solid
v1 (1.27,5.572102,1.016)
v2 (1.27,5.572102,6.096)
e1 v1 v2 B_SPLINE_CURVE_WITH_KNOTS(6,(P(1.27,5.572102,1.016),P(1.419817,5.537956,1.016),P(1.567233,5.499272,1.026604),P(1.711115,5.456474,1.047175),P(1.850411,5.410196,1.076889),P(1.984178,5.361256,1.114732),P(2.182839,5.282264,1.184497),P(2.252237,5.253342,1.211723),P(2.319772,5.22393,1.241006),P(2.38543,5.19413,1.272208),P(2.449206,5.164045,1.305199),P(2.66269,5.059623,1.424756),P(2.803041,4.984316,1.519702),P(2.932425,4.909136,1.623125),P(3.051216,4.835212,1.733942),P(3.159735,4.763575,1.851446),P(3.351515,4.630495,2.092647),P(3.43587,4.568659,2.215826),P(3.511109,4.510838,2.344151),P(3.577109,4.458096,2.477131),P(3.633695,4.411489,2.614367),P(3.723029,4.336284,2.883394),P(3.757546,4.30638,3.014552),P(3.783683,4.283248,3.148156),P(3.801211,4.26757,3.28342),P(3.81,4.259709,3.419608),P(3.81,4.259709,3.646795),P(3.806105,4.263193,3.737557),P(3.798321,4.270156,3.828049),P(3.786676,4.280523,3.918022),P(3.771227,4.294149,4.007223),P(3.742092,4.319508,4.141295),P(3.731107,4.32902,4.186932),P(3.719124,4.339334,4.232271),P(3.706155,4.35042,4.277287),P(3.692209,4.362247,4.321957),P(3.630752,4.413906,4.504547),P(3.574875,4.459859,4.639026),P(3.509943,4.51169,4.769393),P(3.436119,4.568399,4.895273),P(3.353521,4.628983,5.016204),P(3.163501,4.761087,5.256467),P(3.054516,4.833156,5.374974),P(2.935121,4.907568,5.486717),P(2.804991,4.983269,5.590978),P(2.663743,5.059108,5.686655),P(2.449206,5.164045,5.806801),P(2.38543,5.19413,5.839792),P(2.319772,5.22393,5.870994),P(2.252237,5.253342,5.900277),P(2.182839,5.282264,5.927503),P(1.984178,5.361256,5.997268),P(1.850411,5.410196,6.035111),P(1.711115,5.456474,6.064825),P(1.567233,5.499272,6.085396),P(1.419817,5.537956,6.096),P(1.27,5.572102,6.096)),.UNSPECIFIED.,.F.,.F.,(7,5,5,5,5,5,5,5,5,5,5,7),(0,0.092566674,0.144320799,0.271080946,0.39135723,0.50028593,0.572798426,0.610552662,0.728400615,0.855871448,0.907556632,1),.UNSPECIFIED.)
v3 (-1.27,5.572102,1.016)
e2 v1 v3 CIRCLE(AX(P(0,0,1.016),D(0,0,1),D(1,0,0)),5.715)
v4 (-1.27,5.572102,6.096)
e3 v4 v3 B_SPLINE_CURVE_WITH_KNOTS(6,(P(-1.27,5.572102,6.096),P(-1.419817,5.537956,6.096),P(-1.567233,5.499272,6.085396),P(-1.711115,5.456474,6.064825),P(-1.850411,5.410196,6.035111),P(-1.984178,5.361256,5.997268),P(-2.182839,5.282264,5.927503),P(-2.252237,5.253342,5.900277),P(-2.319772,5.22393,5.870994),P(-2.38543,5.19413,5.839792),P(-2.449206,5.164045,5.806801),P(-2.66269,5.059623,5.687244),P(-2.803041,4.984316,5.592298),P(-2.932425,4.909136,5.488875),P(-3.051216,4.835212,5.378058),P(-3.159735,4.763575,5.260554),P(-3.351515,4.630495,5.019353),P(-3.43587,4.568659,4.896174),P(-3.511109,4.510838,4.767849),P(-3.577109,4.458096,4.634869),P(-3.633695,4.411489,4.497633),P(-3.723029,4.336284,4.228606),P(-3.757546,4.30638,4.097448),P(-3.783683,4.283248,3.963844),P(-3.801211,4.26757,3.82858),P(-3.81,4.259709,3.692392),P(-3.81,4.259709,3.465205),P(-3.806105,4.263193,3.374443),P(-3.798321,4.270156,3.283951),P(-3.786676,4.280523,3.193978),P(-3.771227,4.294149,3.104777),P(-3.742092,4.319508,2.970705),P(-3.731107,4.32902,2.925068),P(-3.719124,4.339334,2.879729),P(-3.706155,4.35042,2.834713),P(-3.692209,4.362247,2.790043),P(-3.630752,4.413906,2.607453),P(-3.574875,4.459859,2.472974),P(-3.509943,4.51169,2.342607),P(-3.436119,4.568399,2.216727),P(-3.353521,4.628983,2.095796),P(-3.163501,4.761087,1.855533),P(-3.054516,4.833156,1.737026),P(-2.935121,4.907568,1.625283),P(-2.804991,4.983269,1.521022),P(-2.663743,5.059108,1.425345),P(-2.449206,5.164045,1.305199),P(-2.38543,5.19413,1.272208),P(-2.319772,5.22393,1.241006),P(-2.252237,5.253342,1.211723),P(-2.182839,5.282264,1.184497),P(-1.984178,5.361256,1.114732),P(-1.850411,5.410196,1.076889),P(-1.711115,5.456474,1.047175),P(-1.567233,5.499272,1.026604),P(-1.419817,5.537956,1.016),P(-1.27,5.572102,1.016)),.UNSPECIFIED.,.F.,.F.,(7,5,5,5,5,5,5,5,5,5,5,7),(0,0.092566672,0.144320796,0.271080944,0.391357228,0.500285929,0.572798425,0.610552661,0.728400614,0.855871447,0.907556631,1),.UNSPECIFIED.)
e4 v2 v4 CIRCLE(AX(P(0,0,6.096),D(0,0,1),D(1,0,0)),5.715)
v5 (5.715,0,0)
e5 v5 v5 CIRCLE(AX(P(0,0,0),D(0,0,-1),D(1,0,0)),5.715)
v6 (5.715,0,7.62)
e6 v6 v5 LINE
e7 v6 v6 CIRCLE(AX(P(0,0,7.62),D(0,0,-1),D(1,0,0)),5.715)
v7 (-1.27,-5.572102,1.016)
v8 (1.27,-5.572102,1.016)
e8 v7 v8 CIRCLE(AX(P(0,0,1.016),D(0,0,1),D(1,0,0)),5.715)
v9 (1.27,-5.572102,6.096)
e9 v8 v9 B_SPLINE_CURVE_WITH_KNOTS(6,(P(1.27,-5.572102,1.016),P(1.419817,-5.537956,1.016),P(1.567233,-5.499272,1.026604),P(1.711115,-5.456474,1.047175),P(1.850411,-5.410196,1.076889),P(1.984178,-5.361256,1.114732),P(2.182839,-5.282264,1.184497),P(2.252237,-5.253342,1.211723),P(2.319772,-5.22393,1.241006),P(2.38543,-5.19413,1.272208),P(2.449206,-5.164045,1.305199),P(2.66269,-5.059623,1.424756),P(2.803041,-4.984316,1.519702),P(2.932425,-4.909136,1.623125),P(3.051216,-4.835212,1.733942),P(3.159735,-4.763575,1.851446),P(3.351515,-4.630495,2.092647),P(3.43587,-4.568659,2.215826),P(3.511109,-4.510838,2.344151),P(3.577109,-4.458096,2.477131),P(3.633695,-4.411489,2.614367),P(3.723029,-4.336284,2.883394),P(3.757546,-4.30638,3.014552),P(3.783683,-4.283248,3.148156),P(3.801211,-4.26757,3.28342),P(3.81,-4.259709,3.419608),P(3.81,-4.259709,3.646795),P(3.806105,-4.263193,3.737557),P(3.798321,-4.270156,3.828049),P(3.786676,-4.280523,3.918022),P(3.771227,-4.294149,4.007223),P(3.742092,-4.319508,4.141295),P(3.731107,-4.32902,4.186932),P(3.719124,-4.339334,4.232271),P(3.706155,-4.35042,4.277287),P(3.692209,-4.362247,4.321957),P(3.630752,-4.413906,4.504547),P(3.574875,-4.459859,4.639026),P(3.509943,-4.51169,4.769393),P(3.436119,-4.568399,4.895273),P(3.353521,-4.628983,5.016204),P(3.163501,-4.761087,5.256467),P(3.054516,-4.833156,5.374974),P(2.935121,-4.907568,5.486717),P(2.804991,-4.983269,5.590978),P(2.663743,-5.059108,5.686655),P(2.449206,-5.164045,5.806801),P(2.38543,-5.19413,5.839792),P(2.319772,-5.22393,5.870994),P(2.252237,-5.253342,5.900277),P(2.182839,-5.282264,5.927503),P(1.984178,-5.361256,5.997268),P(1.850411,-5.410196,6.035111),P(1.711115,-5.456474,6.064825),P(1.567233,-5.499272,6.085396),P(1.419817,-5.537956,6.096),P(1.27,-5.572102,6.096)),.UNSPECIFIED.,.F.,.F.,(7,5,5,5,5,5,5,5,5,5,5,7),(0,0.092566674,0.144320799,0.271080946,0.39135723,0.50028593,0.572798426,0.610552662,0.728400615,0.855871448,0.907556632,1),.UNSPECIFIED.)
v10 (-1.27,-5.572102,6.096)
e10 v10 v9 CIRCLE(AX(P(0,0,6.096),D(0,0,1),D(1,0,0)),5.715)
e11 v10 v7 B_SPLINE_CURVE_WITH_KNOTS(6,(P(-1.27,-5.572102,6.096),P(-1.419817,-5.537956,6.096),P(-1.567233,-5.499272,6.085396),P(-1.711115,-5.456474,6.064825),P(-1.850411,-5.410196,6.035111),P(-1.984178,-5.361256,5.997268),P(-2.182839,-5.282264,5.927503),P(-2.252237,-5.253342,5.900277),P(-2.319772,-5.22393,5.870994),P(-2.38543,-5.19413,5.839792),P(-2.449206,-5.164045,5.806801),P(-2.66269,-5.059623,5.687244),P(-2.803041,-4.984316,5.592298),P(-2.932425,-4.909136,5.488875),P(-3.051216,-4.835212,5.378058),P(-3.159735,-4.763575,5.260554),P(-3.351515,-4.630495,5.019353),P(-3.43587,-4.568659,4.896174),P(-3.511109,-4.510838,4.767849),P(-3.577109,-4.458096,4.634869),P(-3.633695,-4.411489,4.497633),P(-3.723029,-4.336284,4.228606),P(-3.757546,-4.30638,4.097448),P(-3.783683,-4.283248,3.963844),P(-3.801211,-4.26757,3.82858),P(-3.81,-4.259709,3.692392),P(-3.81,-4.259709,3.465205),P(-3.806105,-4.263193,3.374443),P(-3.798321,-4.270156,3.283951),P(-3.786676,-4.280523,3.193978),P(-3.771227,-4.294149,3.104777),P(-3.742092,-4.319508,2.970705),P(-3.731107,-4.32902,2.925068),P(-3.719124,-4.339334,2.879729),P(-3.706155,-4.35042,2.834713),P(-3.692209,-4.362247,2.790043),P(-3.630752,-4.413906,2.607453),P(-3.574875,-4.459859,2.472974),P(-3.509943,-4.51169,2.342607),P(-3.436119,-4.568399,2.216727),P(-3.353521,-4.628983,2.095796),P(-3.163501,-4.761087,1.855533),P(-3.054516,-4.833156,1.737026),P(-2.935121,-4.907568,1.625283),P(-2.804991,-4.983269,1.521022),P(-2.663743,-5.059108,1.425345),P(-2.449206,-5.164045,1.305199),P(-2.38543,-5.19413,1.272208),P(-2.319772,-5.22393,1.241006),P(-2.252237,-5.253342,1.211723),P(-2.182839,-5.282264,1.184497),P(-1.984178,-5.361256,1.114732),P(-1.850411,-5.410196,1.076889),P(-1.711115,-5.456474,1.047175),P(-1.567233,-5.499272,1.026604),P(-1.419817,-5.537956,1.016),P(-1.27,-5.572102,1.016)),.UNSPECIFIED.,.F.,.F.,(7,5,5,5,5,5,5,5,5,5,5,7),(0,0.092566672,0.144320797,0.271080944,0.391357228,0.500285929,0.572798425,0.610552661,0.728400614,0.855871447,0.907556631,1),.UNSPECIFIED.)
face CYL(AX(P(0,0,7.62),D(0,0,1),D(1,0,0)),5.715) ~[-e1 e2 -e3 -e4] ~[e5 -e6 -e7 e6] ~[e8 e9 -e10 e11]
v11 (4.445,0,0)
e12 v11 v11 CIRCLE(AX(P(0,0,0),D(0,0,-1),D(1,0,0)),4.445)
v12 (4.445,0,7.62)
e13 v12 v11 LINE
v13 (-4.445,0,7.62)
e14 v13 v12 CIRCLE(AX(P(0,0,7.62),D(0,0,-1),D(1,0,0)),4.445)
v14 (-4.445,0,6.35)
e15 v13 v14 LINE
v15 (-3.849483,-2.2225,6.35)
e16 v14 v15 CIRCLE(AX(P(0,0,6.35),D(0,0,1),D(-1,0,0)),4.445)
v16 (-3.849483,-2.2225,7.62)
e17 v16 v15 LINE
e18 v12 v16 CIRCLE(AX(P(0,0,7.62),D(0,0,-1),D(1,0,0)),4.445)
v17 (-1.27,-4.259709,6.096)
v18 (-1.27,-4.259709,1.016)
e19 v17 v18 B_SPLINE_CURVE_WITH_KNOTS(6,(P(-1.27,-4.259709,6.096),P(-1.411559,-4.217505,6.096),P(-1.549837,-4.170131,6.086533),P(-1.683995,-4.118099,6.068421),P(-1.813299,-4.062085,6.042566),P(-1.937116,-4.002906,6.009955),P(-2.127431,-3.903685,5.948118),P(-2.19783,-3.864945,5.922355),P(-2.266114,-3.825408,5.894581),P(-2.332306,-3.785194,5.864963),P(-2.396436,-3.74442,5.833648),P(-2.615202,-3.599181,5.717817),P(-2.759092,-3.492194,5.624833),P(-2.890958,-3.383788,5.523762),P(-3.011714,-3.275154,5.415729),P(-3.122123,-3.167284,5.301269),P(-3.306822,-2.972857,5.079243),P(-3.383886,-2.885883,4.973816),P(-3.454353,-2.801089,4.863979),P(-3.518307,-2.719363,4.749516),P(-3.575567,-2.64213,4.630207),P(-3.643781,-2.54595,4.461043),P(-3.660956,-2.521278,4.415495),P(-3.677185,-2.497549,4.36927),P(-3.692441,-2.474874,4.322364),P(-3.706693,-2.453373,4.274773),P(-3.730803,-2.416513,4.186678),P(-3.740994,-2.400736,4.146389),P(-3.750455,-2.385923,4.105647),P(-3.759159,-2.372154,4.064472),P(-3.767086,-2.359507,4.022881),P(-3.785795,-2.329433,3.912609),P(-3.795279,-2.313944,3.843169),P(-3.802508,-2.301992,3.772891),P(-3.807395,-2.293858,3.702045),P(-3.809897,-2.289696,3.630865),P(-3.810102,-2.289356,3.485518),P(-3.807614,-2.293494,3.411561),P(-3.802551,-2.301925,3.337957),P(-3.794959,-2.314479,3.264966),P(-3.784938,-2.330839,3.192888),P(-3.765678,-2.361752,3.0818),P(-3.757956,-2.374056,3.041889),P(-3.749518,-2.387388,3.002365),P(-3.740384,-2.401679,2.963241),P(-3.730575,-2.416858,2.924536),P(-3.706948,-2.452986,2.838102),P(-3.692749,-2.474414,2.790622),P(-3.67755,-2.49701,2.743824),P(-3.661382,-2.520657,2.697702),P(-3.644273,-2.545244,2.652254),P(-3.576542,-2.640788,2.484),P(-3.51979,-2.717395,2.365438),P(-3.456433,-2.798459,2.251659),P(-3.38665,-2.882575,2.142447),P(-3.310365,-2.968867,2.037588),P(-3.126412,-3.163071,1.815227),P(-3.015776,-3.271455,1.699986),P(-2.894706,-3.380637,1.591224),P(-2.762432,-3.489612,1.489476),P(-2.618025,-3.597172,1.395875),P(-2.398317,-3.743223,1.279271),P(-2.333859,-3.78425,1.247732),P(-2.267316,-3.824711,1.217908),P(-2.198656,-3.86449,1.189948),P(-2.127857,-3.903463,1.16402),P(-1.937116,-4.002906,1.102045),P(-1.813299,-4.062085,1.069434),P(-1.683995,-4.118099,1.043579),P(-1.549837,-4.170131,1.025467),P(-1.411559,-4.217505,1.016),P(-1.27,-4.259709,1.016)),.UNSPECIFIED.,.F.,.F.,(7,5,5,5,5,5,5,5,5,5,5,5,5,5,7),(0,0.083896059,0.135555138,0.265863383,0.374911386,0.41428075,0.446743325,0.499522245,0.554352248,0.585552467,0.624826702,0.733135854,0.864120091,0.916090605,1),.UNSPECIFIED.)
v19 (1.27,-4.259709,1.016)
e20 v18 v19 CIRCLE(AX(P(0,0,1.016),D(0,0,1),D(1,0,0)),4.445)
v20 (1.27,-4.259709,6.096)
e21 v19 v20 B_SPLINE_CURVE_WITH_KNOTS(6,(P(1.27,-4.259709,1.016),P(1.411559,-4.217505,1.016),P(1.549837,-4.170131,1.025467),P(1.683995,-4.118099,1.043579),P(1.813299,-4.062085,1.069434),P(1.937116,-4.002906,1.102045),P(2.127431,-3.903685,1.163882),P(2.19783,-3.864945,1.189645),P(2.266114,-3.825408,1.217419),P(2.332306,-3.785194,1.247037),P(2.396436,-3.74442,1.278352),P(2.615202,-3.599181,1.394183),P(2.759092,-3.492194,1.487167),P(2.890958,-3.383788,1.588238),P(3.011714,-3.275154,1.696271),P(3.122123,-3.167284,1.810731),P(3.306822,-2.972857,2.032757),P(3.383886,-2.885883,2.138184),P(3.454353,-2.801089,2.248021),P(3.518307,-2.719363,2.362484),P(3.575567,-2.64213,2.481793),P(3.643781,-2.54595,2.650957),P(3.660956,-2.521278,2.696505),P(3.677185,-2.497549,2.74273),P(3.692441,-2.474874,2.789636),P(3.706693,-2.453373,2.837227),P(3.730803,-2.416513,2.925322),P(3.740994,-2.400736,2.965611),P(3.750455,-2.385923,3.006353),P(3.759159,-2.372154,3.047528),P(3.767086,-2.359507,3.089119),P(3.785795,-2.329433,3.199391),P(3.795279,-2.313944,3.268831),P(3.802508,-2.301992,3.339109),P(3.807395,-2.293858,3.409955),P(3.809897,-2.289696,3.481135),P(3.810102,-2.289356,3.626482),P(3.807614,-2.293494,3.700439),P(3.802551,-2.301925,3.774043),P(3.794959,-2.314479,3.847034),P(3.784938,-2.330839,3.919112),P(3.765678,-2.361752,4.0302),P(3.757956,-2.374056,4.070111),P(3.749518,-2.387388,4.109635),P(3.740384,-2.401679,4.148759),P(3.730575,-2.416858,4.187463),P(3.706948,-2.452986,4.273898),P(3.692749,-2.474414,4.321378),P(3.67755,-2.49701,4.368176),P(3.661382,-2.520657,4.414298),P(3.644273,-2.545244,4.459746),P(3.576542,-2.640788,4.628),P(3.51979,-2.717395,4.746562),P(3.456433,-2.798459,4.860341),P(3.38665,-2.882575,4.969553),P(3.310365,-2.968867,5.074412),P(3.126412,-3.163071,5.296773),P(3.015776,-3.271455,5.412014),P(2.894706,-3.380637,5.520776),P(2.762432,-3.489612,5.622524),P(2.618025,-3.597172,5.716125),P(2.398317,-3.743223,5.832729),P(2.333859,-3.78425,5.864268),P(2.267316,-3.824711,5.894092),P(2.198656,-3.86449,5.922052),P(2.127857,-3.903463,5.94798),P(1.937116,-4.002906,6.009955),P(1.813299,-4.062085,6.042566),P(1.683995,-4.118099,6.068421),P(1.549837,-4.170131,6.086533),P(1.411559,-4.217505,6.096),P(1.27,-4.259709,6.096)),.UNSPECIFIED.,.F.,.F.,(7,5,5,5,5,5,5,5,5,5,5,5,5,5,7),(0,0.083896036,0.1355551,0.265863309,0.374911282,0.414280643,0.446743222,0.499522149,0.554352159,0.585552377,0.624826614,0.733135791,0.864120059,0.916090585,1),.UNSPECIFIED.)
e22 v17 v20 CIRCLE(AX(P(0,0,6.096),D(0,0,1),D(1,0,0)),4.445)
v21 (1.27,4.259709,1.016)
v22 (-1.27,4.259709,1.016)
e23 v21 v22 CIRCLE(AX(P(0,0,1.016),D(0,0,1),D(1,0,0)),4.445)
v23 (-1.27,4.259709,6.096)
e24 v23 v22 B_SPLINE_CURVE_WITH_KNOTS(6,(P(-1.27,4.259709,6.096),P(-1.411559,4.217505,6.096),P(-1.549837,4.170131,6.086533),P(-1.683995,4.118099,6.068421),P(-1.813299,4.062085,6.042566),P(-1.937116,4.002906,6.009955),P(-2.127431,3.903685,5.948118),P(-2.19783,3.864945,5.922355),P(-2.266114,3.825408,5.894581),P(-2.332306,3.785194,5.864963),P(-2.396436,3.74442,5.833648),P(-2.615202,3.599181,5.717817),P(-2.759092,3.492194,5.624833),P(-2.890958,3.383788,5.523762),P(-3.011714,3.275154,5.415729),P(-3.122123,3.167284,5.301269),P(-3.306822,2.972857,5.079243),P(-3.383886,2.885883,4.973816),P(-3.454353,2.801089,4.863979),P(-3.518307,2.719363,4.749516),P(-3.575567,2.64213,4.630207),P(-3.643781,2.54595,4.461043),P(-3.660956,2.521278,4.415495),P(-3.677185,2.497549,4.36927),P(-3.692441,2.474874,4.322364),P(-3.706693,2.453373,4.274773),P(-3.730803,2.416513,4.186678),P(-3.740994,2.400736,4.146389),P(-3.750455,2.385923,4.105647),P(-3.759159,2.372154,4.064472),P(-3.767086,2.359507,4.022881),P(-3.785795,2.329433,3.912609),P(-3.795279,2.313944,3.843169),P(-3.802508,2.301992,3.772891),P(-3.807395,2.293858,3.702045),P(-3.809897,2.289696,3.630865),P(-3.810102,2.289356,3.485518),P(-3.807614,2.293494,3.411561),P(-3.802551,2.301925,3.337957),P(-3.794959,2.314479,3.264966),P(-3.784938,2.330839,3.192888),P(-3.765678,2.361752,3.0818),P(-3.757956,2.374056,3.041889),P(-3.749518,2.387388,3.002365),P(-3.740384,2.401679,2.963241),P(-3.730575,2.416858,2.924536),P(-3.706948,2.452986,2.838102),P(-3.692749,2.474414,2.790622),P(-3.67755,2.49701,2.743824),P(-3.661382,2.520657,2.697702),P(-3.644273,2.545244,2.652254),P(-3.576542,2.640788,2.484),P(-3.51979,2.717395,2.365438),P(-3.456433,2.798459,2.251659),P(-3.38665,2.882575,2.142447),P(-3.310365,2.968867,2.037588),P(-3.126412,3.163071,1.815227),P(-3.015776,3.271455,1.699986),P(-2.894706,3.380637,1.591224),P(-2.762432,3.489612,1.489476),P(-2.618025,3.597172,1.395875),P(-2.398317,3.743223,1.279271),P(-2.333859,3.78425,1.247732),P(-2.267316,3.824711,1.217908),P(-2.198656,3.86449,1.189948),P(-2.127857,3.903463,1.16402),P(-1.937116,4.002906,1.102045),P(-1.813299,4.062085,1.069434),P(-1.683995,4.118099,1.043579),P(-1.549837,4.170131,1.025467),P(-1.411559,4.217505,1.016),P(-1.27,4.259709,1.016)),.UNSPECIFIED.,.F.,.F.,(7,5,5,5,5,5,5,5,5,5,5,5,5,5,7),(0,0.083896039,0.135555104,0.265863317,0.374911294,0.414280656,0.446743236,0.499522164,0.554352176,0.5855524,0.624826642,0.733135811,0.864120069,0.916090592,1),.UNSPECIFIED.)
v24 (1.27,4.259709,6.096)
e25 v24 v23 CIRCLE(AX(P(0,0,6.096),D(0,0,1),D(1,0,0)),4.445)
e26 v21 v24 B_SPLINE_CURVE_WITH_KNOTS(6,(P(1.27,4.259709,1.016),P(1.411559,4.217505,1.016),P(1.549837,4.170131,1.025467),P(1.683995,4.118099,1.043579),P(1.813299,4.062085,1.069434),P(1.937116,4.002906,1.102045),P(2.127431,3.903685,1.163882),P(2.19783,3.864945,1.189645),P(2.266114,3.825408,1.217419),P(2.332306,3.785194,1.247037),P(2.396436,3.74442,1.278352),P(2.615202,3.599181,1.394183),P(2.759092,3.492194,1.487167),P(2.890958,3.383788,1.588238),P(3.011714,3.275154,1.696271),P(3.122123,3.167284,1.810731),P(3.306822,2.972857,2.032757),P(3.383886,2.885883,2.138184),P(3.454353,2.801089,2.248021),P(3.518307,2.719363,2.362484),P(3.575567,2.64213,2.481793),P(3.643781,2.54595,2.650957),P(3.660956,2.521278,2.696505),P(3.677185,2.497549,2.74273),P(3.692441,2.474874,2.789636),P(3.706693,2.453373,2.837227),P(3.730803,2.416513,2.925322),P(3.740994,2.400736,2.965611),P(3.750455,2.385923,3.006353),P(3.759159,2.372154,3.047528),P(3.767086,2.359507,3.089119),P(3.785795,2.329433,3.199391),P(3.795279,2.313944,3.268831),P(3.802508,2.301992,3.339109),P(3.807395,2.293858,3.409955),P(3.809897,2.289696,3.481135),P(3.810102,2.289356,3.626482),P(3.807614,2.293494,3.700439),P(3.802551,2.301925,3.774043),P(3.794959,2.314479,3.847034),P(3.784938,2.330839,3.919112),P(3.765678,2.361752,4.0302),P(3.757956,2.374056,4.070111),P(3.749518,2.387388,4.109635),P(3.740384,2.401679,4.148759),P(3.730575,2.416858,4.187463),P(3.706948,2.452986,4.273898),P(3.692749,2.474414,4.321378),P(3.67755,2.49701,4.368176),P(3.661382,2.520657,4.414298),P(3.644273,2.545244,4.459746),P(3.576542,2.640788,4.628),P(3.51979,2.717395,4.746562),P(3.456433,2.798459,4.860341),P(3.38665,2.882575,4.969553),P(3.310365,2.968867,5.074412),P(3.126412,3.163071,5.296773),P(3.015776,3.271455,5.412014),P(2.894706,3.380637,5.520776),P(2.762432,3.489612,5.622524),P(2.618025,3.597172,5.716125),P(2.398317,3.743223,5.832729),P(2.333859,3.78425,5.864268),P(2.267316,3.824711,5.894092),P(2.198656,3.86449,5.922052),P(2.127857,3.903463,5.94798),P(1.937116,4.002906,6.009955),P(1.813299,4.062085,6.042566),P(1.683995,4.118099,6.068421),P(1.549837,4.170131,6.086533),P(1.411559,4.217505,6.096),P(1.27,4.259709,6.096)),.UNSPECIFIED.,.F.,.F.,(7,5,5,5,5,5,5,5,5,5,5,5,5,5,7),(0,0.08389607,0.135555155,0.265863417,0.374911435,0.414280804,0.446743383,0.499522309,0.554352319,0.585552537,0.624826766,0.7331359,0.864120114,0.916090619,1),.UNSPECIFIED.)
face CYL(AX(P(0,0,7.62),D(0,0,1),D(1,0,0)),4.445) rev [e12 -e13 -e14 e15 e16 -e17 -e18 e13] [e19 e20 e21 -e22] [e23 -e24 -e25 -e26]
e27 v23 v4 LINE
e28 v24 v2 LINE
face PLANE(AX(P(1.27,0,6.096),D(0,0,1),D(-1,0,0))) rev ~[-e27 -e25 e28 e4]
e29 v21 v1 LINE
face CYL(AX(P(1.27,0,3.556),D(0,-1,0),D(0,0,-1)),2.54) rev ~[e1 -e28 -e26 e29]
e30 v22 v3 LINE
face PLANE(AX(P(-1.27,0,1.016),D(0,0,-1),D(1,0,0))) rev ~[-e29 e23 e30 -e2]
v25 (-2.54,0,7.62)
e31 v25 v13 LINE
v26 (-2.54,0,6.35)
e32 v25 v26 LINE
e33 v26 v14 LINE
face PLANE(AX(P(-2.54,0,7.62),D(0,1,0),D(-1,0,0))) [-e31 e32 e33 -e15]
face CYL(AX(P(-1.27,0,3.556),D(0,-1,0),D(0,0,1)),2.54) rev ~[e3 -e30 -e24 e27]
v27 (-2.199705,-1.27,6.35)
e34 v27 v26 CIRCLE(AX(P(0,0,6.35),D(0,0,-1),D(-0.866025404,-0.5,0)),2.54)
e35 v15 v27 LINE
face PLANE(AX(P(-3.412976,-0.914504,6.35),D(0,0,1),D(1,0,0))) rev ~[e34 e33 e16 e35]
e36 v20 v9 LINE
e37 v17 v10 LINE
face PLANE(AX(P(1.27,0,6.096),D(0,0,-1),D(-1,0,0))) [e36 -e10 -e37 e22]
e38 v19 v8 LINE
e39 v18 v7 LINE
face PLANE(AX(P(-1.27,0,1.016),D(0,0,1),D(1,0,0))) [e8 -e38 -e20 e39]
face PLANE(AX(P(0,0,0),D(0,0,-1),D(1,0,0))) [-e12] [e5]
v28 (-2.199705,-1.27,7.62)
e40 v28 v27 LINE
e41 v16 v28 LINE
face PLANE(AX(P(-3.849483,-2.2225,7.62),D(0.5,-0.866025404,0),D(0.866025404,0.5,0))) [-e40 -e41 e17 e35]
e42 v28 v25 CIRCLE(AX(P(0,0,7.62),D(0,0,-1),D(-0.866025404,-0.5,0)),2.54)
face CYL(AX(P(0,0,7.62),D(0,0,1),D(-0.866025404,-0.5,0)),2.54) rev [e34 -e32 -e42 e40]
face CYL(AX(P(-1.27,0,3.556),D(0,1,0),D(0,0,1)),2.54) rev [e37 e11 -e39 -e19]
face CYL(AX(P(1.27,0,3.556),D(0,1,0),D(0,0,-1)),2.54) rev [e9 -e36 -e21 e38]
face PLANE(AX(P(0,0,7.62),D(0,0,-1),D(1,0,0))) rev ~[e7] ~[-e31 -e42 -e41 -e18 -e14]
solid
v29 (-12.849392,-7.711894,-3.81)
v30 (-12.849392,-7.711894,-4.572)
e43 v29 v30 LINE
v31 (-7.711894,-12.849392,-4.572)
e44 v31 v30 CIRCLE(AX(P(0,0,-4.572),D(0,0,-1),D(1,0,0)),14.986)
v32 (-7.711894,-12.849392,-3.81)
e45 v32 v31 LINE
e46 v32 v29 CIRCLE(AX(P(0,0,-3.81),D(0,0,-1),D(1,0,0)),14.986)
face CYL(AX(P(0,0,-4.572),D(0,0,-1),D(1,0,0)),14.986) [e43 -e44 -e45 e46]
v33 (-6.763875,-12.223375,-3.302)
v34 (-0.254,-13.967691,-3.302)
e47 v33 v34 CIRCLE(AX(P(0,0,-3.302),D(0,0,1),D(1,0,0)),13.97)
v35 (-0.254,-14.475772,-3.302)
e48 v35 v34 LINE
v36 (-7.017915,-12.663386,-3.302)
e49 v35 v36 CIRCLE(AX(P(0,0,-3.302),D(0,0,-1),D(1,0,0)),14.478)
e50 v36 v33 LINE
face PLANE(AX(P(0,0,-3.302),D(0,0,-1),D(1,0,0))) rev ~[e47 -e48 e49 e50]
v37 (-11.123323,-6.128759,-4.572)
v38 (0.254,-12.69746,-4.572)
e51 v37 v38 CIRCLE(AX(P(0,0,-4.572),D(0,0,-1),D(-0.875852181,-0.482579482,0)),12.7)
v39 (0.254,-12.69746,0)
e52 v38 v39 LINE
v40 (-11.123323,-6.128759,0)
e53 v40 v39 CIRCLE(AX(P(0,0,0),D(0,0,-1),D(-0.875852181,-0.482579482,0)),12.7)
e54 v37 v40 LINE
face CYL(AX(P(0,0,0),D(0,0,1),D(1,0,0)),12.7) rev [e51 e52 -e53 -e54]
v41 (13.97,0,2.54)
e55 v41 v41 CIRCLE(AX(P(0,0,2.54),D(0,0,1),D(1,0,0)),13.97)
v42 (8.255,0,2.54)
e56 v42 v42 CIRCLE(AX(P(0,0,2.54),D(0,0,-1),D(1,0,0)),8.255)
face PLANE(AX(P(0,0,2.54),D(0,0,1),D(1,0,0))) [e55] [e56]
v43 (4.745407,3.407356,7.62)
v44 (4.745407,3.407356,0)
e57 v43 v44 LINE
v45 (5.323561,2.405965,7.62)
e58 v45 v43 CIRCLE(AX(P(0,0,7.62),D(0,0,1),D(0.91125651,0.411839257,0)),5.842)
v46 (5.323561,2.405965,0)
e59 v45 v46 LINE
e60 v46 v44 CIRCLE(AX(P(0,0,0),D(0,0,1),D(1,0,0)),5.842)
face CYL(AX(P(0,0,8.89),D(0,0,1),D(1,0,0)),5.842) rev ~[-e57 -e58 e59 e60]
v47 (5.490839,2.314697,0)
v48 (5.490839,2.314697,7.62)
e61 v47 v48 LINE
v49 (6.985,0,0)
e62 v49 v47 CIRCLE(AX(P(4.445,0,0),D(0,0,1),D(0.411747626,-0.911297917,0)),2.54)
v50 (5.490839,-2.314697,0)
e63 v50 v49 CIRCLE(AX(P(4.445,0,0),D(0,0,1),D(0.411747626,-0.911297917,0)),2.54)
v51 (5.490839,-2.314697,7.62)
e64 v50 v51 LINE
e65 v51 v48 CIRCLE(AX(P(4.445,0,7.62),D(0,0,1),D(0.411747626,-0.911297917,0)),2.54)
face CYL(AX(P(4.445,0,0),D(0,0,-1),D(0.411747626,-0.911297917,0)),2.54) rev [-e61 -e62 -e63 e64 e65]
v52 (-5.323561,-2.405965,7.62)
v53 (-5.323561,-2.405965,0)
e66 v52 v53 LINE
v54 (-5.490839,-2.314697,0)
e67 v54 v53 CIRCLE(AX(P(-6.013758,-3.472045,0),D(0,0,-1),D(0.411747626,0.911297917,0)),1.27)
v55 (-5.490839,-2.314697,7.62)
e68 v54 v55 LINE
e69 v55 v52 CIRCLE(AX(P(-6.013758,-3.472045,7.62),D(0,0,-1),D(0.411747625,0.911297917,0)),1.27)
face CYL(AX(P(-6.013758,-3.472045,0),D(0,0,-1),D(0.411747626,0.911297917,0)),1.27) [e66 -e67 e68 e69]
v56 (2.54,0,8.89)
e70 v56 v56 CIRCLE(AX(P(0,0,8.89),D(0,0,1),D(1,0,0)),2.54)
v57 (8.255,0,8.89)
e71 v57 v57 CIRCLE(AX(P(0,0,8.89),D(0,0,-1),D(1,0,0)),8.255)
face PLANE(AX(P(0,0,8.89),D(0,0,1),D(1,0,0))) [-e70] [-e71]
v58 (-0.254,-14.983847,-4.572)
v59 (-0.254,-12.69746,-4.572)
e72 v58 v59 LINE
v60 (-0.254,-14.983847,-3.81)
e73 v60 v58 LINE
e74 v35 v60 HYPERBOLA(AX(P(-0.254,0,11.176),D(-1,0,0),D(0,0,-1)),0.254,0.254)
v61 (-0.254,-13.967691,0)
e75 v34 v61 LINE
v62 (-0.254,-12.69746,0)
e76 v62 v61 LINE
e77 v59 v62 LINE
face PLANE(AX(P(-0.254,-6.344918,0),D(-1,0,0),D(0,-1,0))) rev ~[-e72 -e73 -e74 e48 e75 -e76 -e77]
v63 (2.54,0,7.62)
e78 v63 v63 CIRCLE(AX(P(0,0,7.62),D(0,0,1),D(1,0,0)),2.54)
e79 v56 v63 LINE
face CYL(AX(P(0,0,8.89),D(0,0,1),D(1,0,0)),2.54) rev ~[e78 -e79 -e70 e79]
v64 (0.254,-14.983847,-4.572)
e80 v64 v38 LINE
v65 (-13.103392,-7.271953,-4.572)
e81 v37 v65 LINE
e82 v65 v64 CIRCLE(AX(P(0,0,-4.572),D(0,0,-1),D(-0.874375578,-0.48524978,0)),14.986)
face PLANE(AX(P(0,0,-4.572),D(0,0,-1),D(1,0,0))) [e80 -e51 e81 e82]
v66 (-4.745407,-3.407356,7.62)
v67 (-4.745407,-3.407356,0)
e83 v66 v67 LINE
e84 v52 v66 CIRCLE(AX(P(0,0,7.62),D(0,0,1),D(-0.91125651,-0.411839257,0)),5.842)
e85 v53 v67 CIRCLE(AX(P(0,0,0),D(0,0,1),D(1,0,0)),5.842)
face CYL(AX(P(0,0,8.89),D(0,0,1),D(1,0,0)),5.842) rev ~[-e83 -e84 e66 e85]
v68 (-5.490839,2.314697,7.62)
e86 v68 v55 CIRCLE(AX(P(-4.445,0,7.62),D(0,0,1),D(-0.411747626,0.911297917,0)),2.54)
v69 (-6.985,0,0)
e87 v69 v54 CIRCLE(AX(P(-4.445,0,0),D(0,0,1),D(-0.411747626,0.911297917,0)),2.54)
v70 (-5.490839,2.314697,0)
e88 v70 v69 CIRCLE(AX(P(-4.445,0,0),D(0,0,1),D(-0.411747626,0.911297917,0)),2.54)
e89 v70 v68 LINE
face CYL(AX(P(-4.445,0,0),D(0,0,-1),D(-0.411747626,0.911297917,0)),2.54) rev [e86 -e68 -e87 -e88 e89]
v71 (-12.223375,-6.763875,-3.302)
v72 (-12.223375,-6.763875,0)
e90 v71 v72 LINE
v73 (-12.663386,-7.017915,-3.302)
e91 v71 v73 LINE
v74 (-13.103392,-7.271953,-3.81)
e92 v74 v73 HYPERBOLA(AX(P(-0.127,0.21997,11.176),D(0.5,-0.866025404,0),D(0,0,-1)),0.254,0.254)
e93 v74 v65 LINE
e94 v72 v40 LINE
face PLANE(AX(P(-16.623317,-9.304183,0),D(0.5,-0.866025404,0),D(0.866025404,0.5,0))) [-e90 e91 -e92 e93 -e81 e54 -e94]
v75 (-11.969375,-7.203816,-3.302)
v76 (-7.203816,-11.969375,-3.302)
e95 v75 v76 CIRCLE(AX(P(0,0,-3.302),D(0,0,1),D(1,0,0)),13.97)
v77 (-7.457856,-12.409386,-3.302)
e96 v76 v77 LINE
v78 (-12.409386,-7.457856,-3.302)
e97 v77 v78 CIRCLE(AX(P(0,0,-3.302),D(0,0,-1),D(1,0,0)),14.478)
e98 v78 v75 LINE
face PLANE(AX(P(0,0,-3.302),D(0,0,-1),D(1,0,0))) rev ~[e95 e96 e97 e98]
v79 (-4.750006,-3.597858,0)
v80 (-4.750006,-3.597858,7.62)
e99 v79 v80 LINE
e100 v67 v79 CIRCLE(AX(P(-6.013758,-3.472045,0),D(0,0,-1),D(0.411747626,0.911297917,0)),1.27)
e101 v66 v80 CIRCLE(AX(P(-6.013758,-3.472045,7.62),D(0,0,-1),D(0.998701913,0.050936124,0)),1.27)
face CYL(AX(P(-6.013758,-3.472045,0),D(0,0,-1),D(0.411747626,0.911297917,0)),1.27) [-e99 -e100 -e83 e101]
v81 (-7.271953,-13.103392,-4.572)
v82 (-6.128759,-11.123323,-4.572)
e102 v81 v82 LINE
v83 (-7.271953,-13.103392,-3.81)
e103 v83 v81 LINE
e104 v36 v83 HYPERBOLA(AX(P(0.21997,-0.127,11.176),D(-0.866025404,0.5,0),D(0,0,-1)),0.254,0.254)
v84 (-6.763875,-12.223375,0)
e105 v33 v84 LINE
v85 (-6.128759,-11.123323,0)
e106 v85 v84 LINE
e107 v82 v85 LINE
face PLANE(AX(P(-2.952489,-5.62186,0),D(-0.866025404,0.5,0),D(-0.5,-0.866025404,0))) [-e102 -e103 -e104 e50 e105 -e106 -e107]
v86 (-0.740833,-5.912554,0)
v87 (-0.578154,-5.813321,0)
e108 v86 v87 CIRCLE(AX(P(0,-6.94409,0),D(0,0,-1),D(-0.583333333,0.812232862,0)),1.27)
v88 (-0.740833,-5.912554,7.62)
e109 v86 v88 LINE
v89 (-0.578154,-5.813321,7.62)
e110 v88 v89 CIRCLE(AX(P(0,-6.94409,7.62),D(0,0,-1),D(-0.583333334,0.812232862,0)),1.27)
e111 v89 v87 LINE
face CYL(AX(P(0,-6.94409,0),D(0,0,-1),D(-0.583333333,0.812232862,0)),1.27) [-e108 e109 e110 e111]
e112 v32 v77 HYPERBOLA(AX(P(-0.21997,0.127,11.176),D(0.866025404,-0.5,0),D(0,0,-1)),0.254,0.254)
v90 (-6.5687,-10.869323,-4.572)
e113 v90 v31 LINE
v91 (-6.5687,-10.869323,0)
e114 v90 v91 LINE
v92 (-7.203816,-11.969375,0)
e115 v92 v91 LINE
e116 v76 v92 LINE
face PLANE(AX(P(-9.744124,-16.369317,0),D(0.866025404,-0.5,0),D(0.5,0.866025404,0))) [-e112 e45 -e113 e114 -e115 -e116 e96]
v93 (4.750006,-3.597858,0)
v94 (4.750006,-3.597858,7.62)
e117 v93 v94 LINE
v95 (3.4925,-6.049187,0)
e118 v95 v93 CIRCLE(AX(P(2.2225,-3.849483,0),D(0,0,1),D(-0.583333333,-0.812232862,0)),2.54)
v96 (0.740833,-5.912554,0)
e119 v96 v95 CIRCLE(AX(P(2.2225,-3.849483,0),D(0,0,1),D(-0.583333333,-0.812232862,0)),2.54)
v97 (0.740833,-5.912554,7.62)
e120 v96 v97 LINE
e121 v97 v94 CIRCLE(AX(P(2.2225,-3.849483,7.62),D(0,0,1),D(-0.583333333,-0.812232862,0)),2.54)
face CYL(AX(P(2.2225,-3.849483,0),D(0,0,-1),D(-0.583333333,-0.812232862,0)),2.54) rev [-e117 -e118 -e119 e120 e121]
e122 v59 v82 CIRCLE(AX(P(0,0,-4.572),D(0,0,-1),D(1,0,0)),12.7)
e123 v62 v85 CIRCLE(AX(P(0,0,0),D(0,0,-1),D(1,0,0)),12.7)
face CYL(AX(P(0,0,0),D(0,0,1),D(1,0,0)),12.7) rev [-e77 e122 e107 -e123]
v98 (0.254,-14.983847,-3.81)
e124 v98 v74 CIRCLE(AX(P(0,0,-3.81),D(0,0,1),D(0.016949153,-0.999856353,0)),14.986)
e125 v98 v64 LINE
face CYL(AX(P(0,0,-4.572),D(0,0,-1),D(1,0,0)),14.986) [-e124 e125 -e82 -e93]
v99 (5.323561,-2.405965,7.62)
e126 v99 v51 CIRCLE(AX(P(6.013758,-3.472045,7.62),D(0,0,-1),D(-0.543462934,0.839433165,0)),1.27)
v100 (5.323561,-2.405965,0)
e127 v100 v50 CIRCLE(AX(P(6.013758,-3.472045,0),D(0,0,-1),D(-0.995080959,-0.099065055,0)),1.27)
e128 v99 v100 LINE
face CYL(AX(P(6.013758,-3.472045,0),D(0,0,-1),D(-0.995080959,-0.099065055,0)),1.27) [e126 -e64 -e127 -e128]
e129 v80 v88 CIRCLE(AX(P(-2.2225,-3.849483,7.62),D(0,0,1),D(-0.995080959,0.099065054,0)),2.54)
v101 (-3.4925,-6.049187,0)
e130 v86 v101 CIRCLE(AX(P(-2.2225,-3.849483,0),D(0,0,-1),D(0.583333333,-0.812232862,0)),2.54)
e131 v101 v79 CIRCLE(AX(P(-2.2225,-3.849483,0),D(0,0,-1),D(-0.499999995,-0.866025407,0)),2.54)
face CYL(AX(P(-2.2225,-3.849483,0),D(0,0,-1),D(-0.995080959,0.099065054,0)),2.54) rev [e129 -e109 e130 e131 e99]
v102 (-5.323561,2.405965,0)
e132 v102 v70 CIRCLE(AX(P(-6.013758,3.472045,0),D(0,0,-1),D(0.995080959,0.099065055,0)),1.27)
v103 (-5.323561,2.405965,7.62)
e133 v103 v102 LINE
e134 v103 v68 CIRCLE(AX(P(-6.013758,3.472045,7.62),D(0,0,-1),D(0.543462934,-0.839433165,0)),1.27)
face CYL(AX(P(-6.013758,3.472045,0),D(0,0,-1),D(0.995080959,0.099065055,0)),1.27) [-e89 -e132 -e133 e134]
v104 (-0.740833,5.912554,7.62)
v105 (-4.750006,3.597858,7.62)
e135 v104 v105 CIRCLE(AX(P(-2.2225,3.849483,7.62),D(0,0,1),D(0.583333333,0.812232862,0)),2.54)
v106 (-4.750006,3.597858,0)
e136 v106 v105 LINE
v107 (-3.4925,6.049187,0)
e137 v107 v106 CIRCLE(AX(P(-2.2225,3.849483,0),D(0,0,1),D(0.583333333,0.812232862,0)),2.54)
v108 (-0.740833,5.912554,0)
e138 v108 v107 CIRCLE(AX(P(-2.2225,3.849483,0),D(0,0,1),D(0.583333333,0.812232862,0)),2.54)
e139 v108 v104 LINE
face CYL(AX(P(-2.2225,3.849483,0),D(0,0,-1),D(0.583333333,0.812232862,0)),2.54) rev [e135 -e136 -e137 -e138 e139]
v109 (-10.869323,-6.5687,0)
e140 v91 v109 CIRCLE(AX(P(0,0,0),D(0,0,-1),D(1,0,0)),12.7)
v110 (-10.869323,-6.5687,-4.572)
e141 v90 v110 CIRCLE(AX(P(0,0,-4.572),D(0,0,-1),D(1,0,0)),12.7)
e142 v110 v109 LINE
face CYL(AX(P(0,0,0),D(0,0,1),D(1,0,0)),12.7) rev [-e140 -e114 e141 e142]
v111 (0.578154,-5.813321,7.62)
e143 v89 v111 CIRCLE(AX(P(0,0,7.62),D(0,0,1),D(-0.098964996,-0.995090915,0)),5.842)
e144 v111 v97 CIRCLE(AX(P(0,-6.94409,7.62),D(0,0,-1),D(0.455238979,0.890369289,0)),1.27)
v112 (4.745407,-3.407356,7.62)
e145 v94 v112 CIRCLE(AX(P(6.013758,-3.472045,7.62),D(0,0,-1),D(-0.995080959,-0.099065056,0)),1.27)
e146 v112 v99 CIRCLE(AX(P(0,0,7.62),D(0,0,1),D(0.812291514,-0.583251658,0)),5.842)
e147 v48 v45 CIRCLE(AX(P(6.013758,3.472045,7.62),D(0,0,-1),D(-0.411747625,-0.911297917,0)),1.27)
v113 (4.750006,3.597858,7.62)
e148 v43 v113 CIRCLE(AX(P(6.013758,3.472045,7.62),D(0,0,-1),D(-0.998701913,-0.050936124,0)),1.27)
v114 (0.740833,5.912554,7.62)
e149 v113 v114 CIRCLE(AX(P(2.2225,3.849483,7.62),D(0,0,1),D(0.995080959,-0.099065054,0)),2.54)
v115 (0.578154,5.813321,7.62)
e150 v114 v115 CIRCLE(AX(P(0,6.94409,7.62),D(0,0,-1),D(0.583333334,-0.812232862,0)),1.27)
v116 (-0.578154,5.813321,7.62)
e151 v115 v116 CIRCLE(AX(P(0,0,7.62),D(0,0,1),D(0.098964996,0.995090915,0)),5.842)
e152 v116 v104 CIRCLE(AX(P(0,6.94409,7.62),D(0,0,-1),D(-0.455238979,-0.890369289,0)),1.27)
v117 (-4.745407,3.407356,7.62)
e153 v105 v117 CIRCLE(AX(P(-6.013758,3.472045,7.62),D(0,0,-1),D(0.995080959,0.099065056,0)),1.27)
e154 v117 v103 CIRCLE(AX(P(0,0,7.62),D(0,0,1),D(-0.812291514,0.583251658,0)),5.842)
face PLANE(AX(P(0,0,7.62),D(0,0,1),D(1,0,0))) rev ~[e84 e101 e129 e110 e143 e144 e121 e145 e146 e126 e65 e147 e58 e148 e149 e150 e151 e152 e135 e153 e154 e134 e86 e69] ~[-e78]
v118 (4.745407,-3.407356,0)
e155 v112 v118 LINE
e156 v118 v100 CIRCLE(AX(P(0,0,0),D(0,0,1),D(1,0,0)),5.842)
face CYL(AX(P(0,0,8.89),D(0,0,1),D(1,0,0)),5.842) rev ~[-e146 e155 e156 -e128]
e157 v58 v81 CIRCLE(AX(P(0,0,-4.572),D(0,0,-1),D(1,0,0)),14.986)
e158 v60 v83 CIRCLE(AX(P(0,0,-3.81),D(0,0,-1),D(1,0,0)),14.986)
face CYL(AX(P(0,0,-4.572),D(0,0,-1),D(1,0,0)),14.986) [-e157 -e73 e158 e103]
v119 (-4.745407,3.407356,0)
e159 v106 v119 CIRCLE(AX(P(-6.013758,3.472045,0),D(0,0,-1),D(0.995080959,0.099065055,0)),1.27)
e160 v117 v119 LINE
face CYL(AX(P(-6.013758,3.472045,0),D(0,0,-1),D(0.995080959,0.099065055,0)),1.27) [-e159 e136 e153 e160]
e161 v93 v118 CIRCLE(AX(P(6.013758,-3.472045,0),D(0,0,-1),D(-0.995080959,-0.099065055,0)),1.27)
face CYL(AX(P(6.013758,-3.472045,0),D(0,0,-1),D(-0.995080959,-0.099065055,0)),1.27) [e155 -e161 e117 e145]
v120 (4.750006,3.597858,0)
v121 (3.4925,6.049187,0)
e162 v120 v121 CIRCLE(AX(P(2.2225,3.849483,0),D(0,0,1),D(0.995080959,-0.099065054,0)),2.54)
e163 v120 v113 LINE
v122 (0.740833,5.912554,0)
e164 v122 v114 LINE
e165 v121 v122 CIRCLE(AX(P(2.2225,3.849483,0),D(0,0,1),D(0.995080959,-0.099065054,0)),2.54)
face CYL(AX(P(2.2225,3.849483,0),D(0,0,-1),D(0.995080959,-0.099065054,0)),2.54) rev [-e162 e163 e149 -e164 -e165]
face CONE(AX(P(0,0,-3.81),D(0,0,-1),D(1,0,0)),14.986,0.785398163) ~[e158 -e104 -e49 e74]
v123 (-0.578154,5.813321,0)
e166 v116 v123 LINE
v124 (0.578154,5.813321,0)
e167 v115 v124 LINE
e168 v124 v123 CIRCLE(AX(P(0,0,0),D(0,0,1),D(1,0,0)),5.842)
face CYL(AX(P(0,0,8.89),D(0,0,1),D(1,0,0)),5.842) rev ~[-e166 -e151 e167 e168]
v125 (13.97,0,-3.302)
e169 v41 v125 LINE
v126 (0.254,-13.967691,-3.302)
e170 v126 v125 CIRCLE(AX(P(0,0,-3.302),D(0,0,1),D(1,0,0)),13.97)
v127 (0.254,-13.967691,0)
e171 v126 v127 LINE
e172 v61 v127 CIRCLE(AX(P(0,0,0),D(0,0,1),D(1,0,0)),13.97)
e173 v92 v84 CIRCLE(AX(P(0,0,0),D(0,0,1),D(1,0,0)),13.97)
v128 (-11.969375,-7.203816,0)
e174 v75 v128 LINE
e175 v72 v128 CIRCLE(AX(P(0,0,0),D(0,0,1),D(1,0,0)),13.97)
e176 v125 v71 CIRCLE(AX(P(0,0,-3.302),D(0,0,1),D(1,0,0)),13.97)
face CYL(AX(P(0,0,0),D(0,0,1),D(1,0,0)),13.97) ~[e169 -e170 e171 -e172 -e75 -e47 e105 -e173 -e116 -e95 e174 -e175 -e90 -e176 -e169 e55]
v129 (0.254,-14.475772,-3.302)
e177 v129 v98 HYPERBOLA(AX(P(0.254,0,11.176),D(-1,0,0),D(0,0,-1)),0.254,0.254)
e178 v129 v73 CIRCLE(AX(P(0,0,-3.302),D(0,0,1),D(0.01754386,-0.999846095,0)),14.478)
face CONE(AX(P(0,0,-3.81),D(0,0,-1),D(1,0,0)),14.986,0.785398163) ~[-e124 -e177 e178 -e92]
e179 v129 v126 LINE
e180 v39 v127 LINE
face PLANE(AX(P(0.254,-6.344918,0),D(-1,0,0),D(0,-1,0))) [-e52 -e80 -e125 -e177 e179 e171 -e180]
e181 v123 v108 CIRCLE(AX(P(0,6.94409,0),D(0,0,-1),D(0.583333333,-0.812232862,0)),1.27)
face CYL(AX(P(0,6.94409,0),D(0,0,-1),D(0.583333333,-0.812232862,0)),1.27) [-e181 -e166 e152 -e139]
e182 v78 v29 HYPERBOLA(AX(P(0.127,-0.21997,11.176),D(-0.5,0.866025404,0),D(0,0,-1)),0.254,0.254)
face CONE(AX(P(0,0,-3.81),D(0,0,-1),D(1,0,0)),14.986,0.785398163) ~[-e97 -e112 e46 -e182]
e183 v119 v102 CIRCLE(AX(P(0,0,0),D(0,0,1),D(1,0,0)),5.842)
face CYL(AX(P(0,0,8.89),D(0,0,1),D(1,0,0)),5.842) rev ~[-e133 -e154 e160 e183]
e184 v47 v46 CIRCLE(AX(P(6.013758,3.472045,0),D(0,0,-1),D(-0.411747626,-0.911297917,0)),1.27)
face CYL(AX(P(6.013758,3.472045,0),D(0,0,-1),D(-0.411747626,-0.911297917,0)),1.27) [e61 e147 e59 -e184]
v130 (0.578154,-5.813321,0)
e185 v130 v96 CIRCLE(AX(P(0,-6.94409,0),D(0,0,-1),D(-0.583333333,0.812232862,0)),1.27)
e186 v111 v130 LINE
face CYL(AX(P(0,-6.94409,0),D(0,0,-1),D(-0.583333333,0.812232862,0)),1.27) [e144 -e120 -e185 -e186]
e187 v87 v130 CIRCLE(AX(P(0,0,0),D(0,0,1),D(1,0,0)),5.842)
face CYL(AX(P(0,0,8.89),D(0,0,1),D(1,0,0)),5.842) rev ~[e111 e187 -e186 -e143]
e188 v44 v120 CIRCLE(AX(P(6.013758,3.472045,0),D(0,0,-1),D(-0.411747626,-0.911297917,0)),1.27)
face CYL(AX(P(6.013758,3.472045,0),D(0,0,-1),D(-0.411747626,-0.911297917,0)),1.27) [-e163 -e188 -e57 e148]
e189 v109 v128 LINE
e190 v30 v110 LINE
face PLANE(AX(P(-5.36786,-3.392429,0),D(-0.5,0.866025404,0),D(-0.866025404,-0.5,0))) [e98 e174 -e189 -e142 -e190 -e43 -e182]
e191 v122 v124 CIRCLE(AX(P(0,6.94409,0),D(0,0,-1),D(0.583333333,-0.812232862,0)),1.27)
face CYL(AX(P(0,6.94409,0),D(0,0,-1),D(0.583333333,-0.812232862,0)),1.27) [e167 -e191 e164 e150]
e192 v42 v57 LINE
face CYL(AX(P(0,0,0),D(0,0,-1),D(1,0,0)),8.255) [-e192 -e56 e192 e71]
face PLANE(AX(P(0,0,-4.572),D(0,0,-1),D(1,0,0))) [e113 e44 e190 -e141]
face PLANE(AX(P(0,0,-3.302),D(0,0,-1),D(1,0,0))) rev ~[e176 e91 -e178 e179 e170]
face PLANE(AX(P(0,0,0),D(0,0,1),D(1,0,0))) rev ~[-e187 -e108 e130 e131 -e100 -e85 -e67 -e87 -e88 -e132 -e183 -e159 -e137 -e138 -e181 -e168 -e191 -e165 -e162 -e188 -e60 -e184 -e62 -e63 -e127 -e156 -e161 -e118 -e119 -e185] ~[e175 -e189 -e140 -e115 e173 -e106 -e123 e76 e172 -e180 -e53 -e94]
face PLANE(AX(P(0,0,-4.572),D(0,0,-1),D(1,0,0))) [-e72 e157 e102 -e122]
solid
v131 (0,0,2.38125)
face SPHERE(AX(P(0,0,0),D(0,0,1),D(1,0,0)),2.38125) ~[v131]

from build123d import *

# Parameters (mm, degrees)
F0_R           = 13.97
F1_DEPTH       = 2.54
F2_R           = 13.97
F2_R_2         = 12.7
F3_DEPTH       = 4.572
F4_R           = 14.986
F4_R_2         = 12.7
F5_DEPTH       = 1.27
F6_SIZE        = 0.508
F8_R           = 6.985
F9_DEPTH       = 7.113
F11_R          = 8.255
F12_DEPTH      = 8.89
F13_R          = 5.842
F14_DEPTH      = 13.463
F15_R          = 2.54
F16_DEPTH      = 1.27
F17_R          = 5.715
F17_R_2        = 4.445
F18_DEPTH      = 7.62
F20_DEPTH      = 14.987
F20_DEPTH_BACK = 14.987
F24_DEPTH      = 1.27
F7_W           = 0.508
F7_H           = 12.703388625
F25_DEPTH      = 4.573


with BuildPart() as f1:
    # F0 (on Top) → F1 (new body)
    with BuildSketch(Plane.XY):
        Circle(F0_R)
    extrude(amount=F1_DEPTH)

    # F2 (on face) → F3 (join)
    with BuildSketch(Plane(origin=(0, 0, 0), x_dir=(1, 0, 0), z_dir=(0, 0, -1))):
        Circle(F2_R)
        Circle(F2_R_2, mode=Mode.SUBTRACT)
    extrude(amount=F3_DEPTH)

    # F4 (on face) → F5 (join)
    with BuildSketch(Plane(origin=(0, 0, -4.572), x_dir=(1, 0, 0), z_dir=(0, 0, -1))):
        Circle(F4_R)
        Circle(F4_R_2, mode=Mode.SUBTRACT)
    extrude(amount=-F5_DEPTH)

    # F6
    f6_edges = [f1.edges().sort_by_distance(p)[0] for p in [
        (-14.986, 0, -3.302),
    ]]
    chamfer(f6_edges, length=F6_SIZE)

    # F8 (on face) → F9 (cut, through all)
    with BuildSketch(Plane.XY.offset(2.54)):
        Circle(F8_R)
    extrude(amount=-F9_DEPTH, mode=Mode.SUBTRACT)

    # F11 (on face) → F12 (join)
    with BuildSketch(Plane(origin=(0, 0, 0), x_dir=(1, 0, 0), z_dir=(0, 0, -1))):
        Circle(F11_R)
        with BuildLine():
            ThreePointArc((-5.4908389692, -2.3146967081), (-6.985, 0), (-5.4908389692, 2.3146967081))
            ThreePointArc((-5.4908389692, 2.3146967081), (-4.913906191, 2.8370450621), (-4.7500056359, 3.5978576814))
            ThreePointArc((-4.7500056359, 3.5978576814), (-3.4925, 6.0491874454), (-0.7408333333, 5.9125543895))
            ThreePointArc((-0.7408333333, 5.9125543895), (0, 5.6740901243), (0.7408333333, 5.9125543895))
            ThreePointArc((0.7408333333, 5.9125543895), (3.4925, 6.0491874454), (4.7500056359, 3.5978576814))
            ThreePointArc((4.7500056359, 3.5978576814), (4.913906191, 2.8370450621), (5.4908389692, 2.3146967081))
            ThreePointArc((5.4908389692, 2.3146967081), (6.985, 0), (5.4908389692, -2.3146967081))
            ThreePointArc((5.4908389692, -2.3146967081), (4.913906191, -2.8370450621), (4.7500056359, -3.5978576814))
            ThreePointArc((4.7500056359, -3.5978576814), (3.4925, -6.0491874454), (0.7408333333, -5.9125543895))
            ThreePointArc((0.7408333333, -5.9125543895), (0, -5.6740901243), (-0.7408333333, -5.9125543895))
            ThreePointArc((-0.7408333333, -5.9125543895), (-3.4925, -6.0491874454), (-4.7500056359, -3.5978576814))
            ThreePointArc((-4.7500056359, -3.5978576814), (-4.913906191, -2.8370450621), (-5.4908389692, -2.3146967081))
        make_face(mode=Mode.SUBTRACT)
    extrude(amount=-F12_DEPTH)

    # F13 (on face) → F14 (cut, through all)
    with BuildSketch(Plane.XY.offset(8.89)):
        Circle(F13_R)
    extrude(amount=-F14_DEPTH, mode=Mode.SUBTRACT)

    # F15 (on face) → F16 (join)
    with BuildSketch(Plane.XY.offset(8.89)):
        with BuildLine():
            ThreePointArc((0.5781535044, -5.813321127), (0.6613572254, -5.8598822935), (0.7408333333, -5.9125543895))
            ThreePointArc((0.7408333333, -5.9125543895), (3.4925, -6.0491874454), (4.7500056359, -3.5978576814))
            ThreePointArc((4.7500056359, -3.5978576814), (4.7441283166, -3.502693305), (4.7454070241, -3.4073561856))
            ThreePointArc((4.7454070241, -3.4073561856), (5.0593204089, -2.921), (5.3235605285, -2.4059649414))
            ThreePointArc((5.3235605285, -2.4059649414), (5.4054855421, -2.3571889885), (5.4908389692, -2.3146967081))
            ThreePointArc((5.4908389692, -2.3146967081), (6.985, 0), (5.4908389692, 2.3146967081))
            ThreePointArc((5.4908389692, 2.3146967081), (5.4054855421, 2.3571889885), (5.3235605285, 2.4059649414))
            ThreePointArc((5.3235605285, 2.4059649414), (5.0593204089, 2.921), (4.7454070241, 3.4073561856))
            ThreePointArc((4.7454070241, 3.4073561856), (4.7441283166, 3.502693305), (4.7500056359, 3.5978576814))
            ThreePointArc((4.7500056359, 3.5978576814), (3.4925, 6.0491874454), (0.7408333333, 5.9125543895))
            ThreePointArc((0.7408333333, 5.9125543895), (0.6613572254, 5.8598822935), (0.5781535044, 5.813321127))
            ThreePointArc((0.5781535044, 5.813321127), (0, 5.842), (-0.5781535044, 5.813321127))
            ThreePointArc((-0.5781535044, 5.813321127), (-0.6613572254, 5.8598822935), (-0.7408333333, 5.9125543895))
            ThreePointArc((-0.7408333333, 5.9125543895), (-3.4925, 6.0491874454), (-4.7500056359, 3.5978576814))
            ThreePointArc((-4.7500056359, 3.5978576814), (-4.7441283166, 3.502693305), (-4.7454070241, 3.4073561856))
            ThreePointArc((-4.7454070241, 3.4073561856), (-5.0593204089, 2.921), (-5.3235605285, 2.4059649414))
            ThreePointArc((-5.3235605285, 2.4059649414), (-5.4054855421, 2.3571889885), (-5.4908389692, 2.3146967081))
            ThreePointArc((-5.4908389692, 2.3146967081), (-6.985, 0), (-5.4908389692, -2.3146967081))
            ThreePointArc((-5.4908389692, -2.3146967081), (-5.4054855421, -2.3571889885), (-5.3235605285, -2.4059649414))
            ThreePointArc((-5.3235605285, -2.4059649414), (-5.0593204089, -2.921), (-4.7454070241, -3.4073561856))
            ThreePointArc((-4.7454070241, -3.4073561856), (-4.7441283166, -3.502693305), (-4.7500056359, -3.5978576814))
            ThreePointArc((-4.7500056359, -3.5978576814), (-3.4925, -6.0491874454), (-0.7408333333, -5.9125543895))
            ThreePointArc((-0.7408333333, -5.9125543895), (-0.6613572254, -5.8598822935), (-0.5781535044, -5.813321127))
            ThreePointArc((-0.5781535044, -5.813321127), (0, -5.842), (0.5781535044, -5.813321127))
        make_face()
        Circle(F15_R, mode=Mode.SUBTRACT)
    extrude(amount=-F16_DEPTH)

    # F7 (on face) → F25 (cut, through all)
    with BuildSketch(Plane(origin=(0, 0, 0), x_dir=(1, 0, 0), z_dir=(0, 0, -1))):
        with Locations((0, 12.6966122789)):
            Rectangle(F7_W, F7_H)
        Polygon((-5.6218601438, 2.9524885306), (-5.3678601438, 3.3924294357), (-16.3693174072, 9.7441237483), (-16.6233174072, 9.3041828431), align=None)
        Polygon((-9.3041828431, 16.6233174072), (-9.7441237483, 16.3693174072), (-3.3924294357, 5.3678601438), (-2.9524885306, 5.6218601438), align=None)
    extrude(amount=F25_DEPTH, mode=Mode.SUBTRACT)


with BuildPart() as f18:
    # F17 (on face) → F18 (new body)
    with BuildSketch(Plane(origin=(0, 0, 7.62), x_dir=(1, 0, 0), z_dir=(0, 0, -1))):
        Circle(F17_R)
        Circle(F17_R_2, mode=Mode.SUBTRACT)
    extrude(amount=F18_DEPTH)

    # F19 (on Front) → F20 (cut, two sides)
    with BuildSketch(Plane.XZ) as f20_sk:
        with BuildLine():
            Line((-1.27, 1.016), (1.27, 1.016))
            ThreePointArc((1.27, 1.016), (3.81, 3.556), (1.27, 6.096))
            Line((1.27, 6.096), (-1.27, 6.096))
            ThreePointArc((-1.27, 6.096), (-3.81, 3.556), (-1.27, 1.016))
        make_face()
    extrude(amount=-F20_DEPTH, mode=Mode.SUBTRACT)
    extrude(f20_sk.sketch, amount=F20_DEPTH_BACK, mode=Mode.SUBTRACT)

    # F23 (on face) → F24 (join)
    with BuildSketch(Plane.XY.offset(7.62)):
        with BuildLine():
            Line((-2.54, 0), (-4.445, 0))
            ThreePointArc((-4.445, 0), (-4.2935402979, -1.1504506555), (-3.8494829198, -2.2225))
            Line((-3.8494829198, -2.2225), (-2.1997045256, -1.27))
            ThreePointArc((-2.1997045256, -1.27), (-2.4534515988, -0.6574003746), (-2.54, 0))
        make_face()
    extrude(amount=-F24_DEPTH)


with BuildPart() as f22:
    # F21 (on Front) → F22 (revolve)
    with BuildSketch(Plane.XZ):
        with BuildLine():
            Line((0, 2.38125), (0, -2.38125))
            ThreePointArc((0, -2.38125), (2.38125, 0), (0, 2.38125))
        make_face()
    revolve(axis=Axis((0, 0, 0), (0, 0, -1)))


solid = Compound([f1.part, f18.part, f22.part])
